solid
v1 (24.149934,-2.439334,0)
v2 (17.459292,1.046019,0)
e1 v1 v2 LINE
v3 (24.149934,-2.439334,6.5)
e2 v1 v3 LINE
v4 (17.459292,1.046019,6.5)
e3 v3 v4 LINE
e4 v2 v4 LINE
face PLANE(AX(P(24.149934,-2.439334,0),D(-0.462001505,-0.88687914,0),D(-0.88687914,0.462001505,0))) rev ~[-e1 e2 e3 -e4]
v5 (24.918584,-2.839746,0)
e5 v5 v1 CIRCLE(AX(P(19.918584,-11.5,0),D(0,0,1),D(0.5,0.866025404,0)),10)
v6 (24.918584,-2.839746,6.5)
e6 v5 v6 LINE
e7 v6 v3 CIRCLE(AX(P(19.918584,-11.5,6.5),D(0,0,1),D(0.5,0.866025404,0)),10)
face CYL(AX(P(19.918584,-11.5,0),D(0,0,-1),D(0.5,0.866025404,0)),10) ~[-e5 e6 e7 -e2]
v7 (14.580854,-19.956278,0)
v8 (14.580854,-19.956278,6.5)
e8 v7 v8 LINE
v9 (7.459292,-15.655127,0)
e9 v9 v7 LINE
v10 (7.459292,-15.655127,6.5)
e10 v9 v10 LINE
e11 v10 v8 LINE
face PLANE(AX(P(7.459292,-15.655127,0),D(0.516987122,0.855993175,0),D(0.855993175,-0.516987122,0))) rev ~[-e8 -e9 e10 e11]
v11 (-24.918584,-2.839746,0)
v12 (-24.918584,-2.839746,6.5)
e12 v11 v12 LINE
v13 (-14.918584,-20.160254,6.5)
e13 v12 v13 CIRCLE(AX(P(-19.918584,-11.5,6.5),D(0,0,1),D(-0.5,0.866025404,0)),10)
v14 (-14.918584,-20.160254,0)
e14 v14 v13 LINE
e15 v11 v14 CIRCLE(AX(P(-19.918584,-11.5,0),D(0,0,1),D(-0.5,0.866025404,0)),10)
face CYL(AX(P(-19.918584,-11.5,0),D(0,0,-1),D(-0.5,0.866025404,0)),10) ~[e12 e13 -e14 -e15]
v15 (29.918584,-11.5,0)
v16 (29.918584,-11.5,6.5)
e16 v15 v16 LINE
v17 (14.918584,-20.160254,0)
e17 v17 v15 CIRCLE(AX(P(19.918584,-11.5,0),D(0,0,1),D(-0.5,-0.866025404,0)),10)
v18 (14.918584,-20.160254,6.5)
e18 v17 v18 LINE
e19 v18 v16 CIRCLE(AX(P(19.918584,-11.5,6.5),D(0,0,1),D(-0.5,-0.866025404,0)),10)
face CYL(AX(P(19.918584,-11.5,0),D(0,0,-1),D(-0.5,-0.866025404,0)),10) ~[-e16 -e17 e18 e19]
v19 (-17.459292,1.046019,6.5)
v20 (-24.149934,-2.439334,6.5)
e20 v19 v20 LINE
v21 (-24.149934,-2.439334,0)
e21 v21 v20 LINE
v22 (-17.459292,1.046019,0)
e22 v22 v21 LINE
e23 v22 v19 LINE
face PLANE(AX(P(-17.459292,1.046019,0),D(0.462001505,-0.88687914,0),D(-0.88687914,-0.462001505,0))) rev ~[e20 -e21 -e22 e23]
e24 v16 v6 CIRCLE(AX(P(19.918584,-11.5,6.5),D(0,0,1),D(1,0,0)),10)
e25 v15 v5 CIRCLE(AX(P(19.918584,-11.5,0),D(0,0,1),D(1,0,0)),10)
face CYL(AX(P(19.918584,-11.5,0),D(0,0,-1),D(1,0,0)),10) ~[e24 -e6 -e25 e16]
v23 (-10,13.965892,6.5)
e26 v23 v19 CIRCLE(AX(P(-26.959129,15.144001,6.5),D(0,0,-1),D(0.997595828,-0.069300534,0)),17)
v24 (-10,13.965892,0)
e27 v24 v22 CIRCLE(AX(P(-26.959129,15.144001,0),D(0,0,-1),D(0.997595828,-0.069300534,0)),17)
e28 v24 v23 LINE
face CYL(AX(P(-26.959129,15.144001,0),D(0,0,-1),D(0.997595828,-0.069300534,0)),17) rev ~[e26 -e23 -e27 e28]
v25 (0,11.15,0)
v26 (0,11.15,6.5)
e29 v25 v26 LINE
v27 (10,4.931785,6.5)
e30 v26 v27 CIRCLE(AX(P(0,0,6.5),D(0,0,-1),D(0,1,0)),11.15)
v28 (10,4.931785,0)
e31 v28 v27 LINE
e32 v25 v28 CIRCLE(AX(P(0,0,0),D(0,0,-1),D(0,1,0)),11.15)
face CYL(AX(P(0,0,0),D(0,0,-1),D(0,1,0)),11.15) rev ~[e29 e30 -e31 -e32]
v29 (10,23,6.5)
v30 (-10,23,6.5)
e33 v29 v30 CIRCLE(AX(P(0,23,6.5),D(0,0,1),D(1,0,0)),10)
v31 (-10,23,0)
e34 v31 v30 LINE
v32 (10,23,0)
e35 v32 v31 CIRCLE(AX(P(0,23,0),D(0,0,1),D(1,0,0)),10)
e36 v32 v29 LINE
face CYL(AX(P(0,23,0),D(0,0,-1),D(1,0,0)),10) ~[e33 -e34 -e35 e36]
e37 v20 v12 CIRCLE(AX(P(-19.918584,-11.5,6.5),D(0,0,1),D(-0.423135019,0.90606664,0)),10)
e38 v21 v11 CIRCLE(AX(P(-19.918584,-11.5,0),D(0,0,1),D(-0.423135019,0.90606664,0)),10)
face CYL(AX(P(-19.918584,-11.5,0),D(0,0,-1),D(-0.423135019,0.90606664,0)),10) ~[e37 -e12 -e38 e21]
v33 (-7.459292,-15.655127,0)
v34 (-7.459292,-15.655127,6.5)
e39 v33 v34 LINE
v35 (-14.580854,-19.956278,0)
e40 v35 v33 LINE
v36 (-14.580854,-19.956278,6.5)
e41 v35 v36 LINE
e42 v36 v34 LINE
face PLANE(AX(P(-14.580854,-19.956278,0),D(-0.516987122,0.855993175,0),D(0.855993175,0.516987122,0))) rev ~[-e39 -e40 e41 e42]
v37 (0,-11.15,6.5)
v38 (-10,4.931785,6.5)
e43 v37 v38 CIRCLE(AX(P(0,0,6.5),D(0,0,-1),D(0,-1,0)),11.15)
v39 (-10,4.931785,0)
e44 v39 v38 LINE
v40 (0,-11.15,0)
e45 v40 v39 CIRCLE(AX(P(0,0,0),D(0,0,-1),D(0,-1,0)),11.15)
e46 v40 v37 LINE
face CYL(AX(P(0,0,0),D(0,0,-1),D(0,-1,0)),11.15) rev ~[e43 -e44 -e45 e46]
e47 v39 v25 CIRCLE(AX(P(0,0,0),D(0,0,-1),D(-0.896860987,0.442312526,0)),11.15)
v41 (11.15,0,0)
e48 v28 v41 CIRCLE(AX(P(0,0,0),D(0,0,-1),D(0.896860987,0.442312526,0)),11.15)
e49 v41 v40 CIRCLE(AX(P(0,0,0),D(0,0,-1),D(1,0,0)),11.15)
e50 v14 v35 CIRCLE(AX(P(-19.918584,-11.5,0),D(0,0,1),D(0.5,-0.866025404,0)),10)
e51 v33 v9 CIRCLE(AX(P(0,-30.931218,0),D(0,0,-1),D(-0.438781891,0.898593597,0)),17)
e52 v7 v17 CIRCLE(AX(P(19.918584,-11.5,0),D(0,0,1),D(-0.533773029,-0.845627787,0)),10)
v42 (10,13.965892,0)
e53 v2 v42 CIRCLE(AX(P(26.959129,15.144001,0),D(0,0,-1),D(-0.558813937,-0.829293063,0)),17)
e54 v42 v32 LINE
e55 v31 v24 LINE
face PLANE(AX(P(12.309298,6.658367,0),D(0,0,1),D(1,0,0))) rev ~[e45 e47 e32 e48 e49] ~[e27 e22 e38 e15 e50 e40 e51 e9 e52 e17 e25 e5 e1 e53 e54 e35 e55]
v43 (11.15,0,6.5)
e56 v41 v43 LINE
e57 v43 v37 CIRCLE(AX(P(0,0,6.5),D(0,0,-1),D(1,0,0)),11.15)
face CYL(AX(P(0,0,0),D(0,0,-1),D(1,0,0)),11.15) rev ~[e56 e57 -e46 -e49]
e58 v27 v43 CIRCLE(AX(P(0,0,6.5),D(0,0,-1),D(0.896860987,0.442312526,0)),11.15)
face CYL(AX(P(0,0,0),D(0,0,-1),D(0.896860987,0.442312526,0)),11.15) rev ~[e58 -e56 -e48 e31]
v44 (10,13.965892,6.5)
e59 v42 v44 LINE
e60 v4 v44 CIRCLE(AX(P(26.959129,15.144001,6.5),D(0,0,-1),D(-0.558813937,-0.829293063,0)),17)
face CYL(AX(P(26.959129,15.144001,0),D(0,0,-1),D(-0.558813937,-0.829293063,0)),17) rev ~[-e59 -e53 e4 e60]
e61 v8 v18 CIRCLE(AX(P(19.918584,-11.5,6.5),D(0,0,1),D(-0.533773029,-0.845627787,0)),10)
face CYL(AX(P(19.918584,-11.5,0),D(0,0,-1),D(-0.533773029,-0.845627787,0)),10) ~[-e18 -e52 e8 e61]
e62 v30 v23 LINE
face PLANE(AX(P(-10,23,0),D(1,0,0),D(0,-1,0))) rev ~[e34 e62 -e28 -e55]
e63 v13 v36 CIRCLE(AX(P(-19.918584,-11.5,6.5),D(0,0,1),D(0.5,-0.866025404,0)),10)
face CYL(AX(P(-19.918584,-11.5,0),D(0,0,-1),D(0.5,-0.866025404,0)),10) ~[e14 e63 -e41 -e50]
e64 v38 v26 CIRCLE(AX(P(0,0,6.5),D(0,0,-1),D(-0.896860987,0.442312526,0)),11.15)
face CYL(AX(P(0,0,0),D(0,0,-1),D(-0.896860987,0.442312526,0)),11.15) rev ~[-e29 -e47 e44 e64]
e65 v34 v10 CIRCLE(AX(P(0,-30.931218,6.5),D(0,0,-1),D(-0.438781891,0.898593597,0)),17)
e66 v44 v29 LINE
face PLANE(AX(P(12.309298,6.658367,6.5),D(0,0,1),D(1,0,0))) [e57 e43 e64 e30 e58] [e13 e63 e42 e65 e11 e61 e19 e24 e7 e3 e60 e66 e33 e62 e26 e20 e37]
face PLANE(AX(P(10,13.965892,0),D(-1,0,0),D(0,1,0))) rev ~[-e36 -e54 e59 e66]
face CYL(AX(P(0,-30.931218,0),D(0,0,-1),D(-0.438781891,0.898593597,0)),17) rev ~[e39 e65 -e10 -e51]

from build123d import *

# Parameters (mm, degrees)
F1_DEPTH = 6.5


# Not quite as in the source:
# - a feature names something its author has since deleted; it is built from what else it names


with BuildPart() as f1:
    # F0 (on Top) → F1 (new body)
    with BuildSketch(Plane.XY):
        with BuildLine():
            Line((10, 13.9658923334), (10, 5.6794919243))
            Line((10, 5.6794919243), (10.6173677664, 4.610179586))
            Line((10.6173677664, 4.610179586), (17.4592921435, 1.0460193523))
            ThreePointArc((17.4592921435, 1.0460193523), (12.2366972109, 6.6440014162), (10, 13.9658923334))
        make_face()
        with BuildLine():
            Line((5, 14.3397459622), (10, 5.6794919243))
            Line((10, 5.6794919243), (10, 13.9658923334))
            Line((10, 13.9658923334), (10, 23))
            ThreePointArc((10, 23), (8.6602540378, 18), (5, 14.3397459622))
        make_face()
        with BuildLine():
            Line((17.4592921435, 1.0460193523), (10.6173677664, 4.610179586))
            Line((10.6173677664, 4.610179586), (14.918584287, -2.8397459622))
            ThreePointArc((14.918584287, -2.8397459622), (19.4852389907, -1.5093938195), (24.1499344795, -2.4393336035))
            Line((24.1499344795, -2.4393336035), (17.4592921435, 1.0460193523))
        make_face()
        with BuildLine():
            Line((-7.4592921435, -15.6551270189), (-0.5795069127, -11.5))
            Line((-0.5795069127, -11.5), (-9.918584287, -11.5))
            ThreePointArc((-9.918584287, -11.5), (-11.1613785992, -16.328182737), (-14.5808539954, -19.9562778652))
            Line((-14.5808539954, -19.9562778652), (-7.4592921435, -15.6551270189))
        make_face()
        with BuildLine():
            Line((0.5795069127, -11.5), (-0.5795069127, -11.5))
            Line((-0.5795069127, -11.5), (-7.4592921435, -15.6551270189))
            ThreePointArc((-7.4592921435, -15.6551270189), (0, -13.9312181655), (7.4592921435, -15.6551270189))
            Line((7.4592921435, -15.6551270189), (0.5795069127, -11.5))
        make_face()
        with BuildLine():
            Line((9.918584287, -11.5), (0.5795069127, -11.5))
            Line((0.5795069127, -11.5), (7.4592921435, -15.6551270189))
            Line((7.4592921435, -15.6551270189), (14.5808539954, -19.9562778652))
            ThreePointArc((14.5808539954, -19.9562778652), (11.1613785992, -16.328182737), (9.918584287, -11.5))
        make_face()
        with BuildLine():
            Line((0, 23), (5, 14.3397459622))
            ThreePointArc((5, 14.3397459622), (8.6602540378, 18), (10, 23))
            Line((10, 23), (0, 23))
        make_face()
        with BuildLine():
            ThreePointArc((24.1499344795, -2.4393336035), (19.4852389907, -1.5093938195), (14.918584287, -2.8397459622))
            Line((14.918584287, -2.8397459622), (19.918584287, -11.5))
            Line((19.918584287, -11.5), (24.918584287, -2.8397459622))
            Line((24.918584287, -2.8397459622), (24.1499344795, -2.4393336035))
        make_face()
        with BuildLine():
            Line((-10, 13.9658923334), (-10, 5.6794919243))
            Line((-10, 5.6794919243), (-5, 14.3397459622))
            ThreePointArc((-5, 14.3397459622), (-8.6602540378, 18), (-10, 23))
            Line((-10, 23), (-10, 13.9658923334))
        make_face()
        with BuildLine():
            Line((-10.6173677664, 4.610179586), (-10, 5.6794919243))
            Line((-10, 5.6794919243), (-10, 13.9658923334))
            ThreePointArc((-10, 13.9658923334), (-12.2366972109, 6.6440014162), (-17.4592921435, 1.0460193523))
            Line((-17.4592921435, 1.0460193523), (-10.6173677664, 4.610179586))
        make_face()
        with BuildLine():
            Line((-14.918584287, -2.8397459622), (-10.6173677664, 4.610179586))
            Line((-10.6173677664, 4.610179586), (-17.4592921435, 1.0460193523))
            Line((-17.4592921435, 1.0460193523), (-24.1499344795, -2.4393336035))
            ThreePointArc((-24.1499344795, -2.4393336035), (-19.4852389907, -1.5093938195), (-14.918584287, -2.8397459622))
        make_face()
        with BuildLine():
            ThreePointArc((-14.5808539954, -19.9562778652), (-11.1613785992, -16.328182737), (-9.918584287, -11.5))
            Line((-9.918584287, -11.5), (-19.918584287, -11.5))
            Line((-19.918584287, -11.5), (-14.918584287, -20.1602540378))
            Line((-14.918584287, -20.1602540378), (-14.5808539954, -19.9562778652))
        make_face()
        with BuildLine():
            Line((19.918584287, -11.5), (9.918584287, -11.5))
            ThreePointArc((9.918584287, -11.5), (11.1613785992, -16.328182737), (14.5808539954, -19.9562778652))
            Line((14.5808539954, -19.9562778652), (14.918584287, -20.1602540378))
            Line((14.918584287, -20.1602540378), (19.918584287, -11.5))
        make_face()
        with BuildLine():
            Line((-5, 14.3397459622), (0, 23))
            Line((0, 23), (-10, 23))
            ThreePointArc((-10, 23), (-8.6602540378, 18), (-5, 14.3397459622))
        make_face()
        with BuildLine():
            Line((-10, 23), (0, 23))
            Line((0, 23), (10, 23))
            ThreePointArc((10, 23), (0, 33), (-10, 23))
        make_face()
        with BuildLine():
            Line((24.918584287, -2.8397459622), (19.918584287, -11.5))
            Line((19.918584287, -11.5), (14.918584287, -20.1602540378))
            ThreePointArc((14.918584287, -20.1602540378), (24.918584287, -20.1602540378), (29.918584287, -11.5))
            ThreePointArc((29.918584287, -11.5), (28.5788383249, -6.5), (24.918584287, -2.8397459622))
        make_face()
        with BuildLine():
            ThreePointArc((24.918584287, -2.8397459622), (24.538599342, -2.6312086003), (24.1499344795, -2.4393336035))
            Line((24.1499344795, -2.4393336035), (24.918584287, -2.8397459622))
        make_face()
        with BuildLine():
            Line((-19.918584287, -11.5), (-14.918584287, -2.8397459622))
            ThreePointArc((-14.918584287, -2.8397459622), (-19.4852389907, -1.5093938195), (-24.1499344795, -2.4393336035))
            Line((-24.1499344795, -2.4393336035), (-24.918584287, -2.8397459622))
            Line((-24.918584287, -2.8397459622), (-19.918584287, -11.5))
        make_face()
        with BuildLine():
            Line((-14.918584287, -20.1602540378), (-19.918584287, -11.5))
            Line((-19.918584287, -11.5), (-24.918584287, -2.8397459622))
            ThreePointArc((-24.918584287, -2.8397459622), (-28.5788383249, -16.5), (-14.918584287, -20.1602540378))
        make_face()
        with BuildLine():
            ThreePointArc((-14.918584287, -20.1602540378), (-14.7487130637, -20.0599317482), (-14.5808539954, -19.9562778652))
            Line((-14.5808539954, -19.9562778652), (-14.918584287, -20.1602540378))
        make_face()
        with BuildLine():
            Line((14.918584287, -20.1602540378), (14.5808539954, -19.9562778652))
            ThreePointArc((14.5808539954, -19.9562778652), (14.7487130637, -20.0599317482), (14.918584287, -20.1602540378))
        make_face()
        with BuildLine():
            Line((-24.918584287, -2.8397459622), (-24.1499344795, -2.4393336035))
            ThreePointArc((-24.1499344795, -2.4393336035), (-24.538599342, -2.6312086003), (-24.918584287, -2.8397459622))
        make_face()
        with BuildLine():
            Line((-0.5795069127, -11.5), (0, -11.15))
            ThreePointArc((0, -11.15), (-9.468682565, -5.8878307111), (-10, 4.9317846668))
            Line((-10, 4.9317846668), (-10.6173677664, 4.610179586))
            Line((-10.6173677664, 4.610179586), (-14.918584287, -2.8397459622))
            ThreePointArc((-14.918584287, -2.8397459622), (-11.2583302492, -6.5), (-9.918584287, -11.5))
            Line((-9.918584287, -11.5), (-0.5795069127, -11.5))
        make_face()
        with BuildLine():
            Line((-19.918584287, -11.5), (-9.918584287, -11.5))
            ThreePointArc((-9.918584287, -11.5), (-11.2583302492, -6.5), (-14.918584287, -2.8397459622))
            Line((-14.918584287, -2.8397459622), (-19.918584287, -11.5))
        make_face()
        Polygon((-10.6173677664, 4.610179586), (-10, 4.9317846668), (-10, 5.6794919243), align=None)
        with BuildLine():
            ThreePointArc((-10, 4.9317846668), (-5.8878307111, 9.468682565), (0, 11.15))
            Line((0, 11.15), (0, 13))
            ThreePointArc((0, 13), (-2.588190451, 13.3407417371), (-5, 14.3397459622))
            Line((-5, 14.3397459622), (-10, 5.6794919243))
            Line((-10, 5.6794919243), (-10, 4.9317846668))
        make_face()
        with BuildLine():
            ThreePointArc((-5, 14.3397459622), (-2.588190451, 13.3407417371), (0, 13))
            Line((0, 13), (0, 23))
            Line((0, 23), (-5, 14.3397459622))
        make_face()
        with BuildLine():
            Line((0, 23), (0, 13))
            ThreePointArc((0, 13), (2.588190451, 13.3407417371), (5, 14.3397459622))
            Line((5, 14.3397459622), (0, 23))
        make_face()
        with BuildLine():
            ThreePointArc((0, 11.15), (5.8878307111, 9.468682565), (10, 4.9317846668))
            Line((10, 4.9317846668), (10, 5.6794919243))
            Line((10, 5.6794919243), (5, 14.3397459622))
            ThreePointArc((5, 14.3397459622), (2.588190451, 13.3407417371), (0, 13))
            Line((0, 13), (0, 11.15))
        make_face()
        Polygon((10, 5.6794919243), (10, 4.9317846668), (10.6173677664, 4.610179586), align=None)
        with BuildLine():
            ThreePointArc((10, 4.9317846668), (10.8586946729, 2.5320446284), (11.15, 0))
            ThreePointArc((11.15, 0), (7.8842406102, -7.8842406102), (0, -11.15))
            Line((0, -11.15), (0.5795069127, -11.5))
            Line((0.5795069127, -11.5), (9.918584287, -11.5))
            ThreePointArc((9.918584287, -11.5), (11.2583302492, -6.5), (14.918584287, -2.8397459622))
            Line((14.918584287, -2.8397459622), (10.6173677664, 4.610179586))
            Line((10.6173677664, 4.610179586), (10, 4.9317846668))
        make_face()
        with BuildLine():
            Line((19.918584287, -11.5), (14.918584287, -2.8397459622))
            ThreePointArc((14.918584287, -2.8397459622), (11.2583302492, -6.5), (9.918584287, -11.5))
            Line((9.918584287, -11.5), (19.918584287, -11.5))
        make_face()
        Polygon((0.5795069127, -11.5), (0, -11.15), (-0.5795069127, -11.5), align=None)
    extrude(amount=F1_DEPTH)


solid = f1.part
